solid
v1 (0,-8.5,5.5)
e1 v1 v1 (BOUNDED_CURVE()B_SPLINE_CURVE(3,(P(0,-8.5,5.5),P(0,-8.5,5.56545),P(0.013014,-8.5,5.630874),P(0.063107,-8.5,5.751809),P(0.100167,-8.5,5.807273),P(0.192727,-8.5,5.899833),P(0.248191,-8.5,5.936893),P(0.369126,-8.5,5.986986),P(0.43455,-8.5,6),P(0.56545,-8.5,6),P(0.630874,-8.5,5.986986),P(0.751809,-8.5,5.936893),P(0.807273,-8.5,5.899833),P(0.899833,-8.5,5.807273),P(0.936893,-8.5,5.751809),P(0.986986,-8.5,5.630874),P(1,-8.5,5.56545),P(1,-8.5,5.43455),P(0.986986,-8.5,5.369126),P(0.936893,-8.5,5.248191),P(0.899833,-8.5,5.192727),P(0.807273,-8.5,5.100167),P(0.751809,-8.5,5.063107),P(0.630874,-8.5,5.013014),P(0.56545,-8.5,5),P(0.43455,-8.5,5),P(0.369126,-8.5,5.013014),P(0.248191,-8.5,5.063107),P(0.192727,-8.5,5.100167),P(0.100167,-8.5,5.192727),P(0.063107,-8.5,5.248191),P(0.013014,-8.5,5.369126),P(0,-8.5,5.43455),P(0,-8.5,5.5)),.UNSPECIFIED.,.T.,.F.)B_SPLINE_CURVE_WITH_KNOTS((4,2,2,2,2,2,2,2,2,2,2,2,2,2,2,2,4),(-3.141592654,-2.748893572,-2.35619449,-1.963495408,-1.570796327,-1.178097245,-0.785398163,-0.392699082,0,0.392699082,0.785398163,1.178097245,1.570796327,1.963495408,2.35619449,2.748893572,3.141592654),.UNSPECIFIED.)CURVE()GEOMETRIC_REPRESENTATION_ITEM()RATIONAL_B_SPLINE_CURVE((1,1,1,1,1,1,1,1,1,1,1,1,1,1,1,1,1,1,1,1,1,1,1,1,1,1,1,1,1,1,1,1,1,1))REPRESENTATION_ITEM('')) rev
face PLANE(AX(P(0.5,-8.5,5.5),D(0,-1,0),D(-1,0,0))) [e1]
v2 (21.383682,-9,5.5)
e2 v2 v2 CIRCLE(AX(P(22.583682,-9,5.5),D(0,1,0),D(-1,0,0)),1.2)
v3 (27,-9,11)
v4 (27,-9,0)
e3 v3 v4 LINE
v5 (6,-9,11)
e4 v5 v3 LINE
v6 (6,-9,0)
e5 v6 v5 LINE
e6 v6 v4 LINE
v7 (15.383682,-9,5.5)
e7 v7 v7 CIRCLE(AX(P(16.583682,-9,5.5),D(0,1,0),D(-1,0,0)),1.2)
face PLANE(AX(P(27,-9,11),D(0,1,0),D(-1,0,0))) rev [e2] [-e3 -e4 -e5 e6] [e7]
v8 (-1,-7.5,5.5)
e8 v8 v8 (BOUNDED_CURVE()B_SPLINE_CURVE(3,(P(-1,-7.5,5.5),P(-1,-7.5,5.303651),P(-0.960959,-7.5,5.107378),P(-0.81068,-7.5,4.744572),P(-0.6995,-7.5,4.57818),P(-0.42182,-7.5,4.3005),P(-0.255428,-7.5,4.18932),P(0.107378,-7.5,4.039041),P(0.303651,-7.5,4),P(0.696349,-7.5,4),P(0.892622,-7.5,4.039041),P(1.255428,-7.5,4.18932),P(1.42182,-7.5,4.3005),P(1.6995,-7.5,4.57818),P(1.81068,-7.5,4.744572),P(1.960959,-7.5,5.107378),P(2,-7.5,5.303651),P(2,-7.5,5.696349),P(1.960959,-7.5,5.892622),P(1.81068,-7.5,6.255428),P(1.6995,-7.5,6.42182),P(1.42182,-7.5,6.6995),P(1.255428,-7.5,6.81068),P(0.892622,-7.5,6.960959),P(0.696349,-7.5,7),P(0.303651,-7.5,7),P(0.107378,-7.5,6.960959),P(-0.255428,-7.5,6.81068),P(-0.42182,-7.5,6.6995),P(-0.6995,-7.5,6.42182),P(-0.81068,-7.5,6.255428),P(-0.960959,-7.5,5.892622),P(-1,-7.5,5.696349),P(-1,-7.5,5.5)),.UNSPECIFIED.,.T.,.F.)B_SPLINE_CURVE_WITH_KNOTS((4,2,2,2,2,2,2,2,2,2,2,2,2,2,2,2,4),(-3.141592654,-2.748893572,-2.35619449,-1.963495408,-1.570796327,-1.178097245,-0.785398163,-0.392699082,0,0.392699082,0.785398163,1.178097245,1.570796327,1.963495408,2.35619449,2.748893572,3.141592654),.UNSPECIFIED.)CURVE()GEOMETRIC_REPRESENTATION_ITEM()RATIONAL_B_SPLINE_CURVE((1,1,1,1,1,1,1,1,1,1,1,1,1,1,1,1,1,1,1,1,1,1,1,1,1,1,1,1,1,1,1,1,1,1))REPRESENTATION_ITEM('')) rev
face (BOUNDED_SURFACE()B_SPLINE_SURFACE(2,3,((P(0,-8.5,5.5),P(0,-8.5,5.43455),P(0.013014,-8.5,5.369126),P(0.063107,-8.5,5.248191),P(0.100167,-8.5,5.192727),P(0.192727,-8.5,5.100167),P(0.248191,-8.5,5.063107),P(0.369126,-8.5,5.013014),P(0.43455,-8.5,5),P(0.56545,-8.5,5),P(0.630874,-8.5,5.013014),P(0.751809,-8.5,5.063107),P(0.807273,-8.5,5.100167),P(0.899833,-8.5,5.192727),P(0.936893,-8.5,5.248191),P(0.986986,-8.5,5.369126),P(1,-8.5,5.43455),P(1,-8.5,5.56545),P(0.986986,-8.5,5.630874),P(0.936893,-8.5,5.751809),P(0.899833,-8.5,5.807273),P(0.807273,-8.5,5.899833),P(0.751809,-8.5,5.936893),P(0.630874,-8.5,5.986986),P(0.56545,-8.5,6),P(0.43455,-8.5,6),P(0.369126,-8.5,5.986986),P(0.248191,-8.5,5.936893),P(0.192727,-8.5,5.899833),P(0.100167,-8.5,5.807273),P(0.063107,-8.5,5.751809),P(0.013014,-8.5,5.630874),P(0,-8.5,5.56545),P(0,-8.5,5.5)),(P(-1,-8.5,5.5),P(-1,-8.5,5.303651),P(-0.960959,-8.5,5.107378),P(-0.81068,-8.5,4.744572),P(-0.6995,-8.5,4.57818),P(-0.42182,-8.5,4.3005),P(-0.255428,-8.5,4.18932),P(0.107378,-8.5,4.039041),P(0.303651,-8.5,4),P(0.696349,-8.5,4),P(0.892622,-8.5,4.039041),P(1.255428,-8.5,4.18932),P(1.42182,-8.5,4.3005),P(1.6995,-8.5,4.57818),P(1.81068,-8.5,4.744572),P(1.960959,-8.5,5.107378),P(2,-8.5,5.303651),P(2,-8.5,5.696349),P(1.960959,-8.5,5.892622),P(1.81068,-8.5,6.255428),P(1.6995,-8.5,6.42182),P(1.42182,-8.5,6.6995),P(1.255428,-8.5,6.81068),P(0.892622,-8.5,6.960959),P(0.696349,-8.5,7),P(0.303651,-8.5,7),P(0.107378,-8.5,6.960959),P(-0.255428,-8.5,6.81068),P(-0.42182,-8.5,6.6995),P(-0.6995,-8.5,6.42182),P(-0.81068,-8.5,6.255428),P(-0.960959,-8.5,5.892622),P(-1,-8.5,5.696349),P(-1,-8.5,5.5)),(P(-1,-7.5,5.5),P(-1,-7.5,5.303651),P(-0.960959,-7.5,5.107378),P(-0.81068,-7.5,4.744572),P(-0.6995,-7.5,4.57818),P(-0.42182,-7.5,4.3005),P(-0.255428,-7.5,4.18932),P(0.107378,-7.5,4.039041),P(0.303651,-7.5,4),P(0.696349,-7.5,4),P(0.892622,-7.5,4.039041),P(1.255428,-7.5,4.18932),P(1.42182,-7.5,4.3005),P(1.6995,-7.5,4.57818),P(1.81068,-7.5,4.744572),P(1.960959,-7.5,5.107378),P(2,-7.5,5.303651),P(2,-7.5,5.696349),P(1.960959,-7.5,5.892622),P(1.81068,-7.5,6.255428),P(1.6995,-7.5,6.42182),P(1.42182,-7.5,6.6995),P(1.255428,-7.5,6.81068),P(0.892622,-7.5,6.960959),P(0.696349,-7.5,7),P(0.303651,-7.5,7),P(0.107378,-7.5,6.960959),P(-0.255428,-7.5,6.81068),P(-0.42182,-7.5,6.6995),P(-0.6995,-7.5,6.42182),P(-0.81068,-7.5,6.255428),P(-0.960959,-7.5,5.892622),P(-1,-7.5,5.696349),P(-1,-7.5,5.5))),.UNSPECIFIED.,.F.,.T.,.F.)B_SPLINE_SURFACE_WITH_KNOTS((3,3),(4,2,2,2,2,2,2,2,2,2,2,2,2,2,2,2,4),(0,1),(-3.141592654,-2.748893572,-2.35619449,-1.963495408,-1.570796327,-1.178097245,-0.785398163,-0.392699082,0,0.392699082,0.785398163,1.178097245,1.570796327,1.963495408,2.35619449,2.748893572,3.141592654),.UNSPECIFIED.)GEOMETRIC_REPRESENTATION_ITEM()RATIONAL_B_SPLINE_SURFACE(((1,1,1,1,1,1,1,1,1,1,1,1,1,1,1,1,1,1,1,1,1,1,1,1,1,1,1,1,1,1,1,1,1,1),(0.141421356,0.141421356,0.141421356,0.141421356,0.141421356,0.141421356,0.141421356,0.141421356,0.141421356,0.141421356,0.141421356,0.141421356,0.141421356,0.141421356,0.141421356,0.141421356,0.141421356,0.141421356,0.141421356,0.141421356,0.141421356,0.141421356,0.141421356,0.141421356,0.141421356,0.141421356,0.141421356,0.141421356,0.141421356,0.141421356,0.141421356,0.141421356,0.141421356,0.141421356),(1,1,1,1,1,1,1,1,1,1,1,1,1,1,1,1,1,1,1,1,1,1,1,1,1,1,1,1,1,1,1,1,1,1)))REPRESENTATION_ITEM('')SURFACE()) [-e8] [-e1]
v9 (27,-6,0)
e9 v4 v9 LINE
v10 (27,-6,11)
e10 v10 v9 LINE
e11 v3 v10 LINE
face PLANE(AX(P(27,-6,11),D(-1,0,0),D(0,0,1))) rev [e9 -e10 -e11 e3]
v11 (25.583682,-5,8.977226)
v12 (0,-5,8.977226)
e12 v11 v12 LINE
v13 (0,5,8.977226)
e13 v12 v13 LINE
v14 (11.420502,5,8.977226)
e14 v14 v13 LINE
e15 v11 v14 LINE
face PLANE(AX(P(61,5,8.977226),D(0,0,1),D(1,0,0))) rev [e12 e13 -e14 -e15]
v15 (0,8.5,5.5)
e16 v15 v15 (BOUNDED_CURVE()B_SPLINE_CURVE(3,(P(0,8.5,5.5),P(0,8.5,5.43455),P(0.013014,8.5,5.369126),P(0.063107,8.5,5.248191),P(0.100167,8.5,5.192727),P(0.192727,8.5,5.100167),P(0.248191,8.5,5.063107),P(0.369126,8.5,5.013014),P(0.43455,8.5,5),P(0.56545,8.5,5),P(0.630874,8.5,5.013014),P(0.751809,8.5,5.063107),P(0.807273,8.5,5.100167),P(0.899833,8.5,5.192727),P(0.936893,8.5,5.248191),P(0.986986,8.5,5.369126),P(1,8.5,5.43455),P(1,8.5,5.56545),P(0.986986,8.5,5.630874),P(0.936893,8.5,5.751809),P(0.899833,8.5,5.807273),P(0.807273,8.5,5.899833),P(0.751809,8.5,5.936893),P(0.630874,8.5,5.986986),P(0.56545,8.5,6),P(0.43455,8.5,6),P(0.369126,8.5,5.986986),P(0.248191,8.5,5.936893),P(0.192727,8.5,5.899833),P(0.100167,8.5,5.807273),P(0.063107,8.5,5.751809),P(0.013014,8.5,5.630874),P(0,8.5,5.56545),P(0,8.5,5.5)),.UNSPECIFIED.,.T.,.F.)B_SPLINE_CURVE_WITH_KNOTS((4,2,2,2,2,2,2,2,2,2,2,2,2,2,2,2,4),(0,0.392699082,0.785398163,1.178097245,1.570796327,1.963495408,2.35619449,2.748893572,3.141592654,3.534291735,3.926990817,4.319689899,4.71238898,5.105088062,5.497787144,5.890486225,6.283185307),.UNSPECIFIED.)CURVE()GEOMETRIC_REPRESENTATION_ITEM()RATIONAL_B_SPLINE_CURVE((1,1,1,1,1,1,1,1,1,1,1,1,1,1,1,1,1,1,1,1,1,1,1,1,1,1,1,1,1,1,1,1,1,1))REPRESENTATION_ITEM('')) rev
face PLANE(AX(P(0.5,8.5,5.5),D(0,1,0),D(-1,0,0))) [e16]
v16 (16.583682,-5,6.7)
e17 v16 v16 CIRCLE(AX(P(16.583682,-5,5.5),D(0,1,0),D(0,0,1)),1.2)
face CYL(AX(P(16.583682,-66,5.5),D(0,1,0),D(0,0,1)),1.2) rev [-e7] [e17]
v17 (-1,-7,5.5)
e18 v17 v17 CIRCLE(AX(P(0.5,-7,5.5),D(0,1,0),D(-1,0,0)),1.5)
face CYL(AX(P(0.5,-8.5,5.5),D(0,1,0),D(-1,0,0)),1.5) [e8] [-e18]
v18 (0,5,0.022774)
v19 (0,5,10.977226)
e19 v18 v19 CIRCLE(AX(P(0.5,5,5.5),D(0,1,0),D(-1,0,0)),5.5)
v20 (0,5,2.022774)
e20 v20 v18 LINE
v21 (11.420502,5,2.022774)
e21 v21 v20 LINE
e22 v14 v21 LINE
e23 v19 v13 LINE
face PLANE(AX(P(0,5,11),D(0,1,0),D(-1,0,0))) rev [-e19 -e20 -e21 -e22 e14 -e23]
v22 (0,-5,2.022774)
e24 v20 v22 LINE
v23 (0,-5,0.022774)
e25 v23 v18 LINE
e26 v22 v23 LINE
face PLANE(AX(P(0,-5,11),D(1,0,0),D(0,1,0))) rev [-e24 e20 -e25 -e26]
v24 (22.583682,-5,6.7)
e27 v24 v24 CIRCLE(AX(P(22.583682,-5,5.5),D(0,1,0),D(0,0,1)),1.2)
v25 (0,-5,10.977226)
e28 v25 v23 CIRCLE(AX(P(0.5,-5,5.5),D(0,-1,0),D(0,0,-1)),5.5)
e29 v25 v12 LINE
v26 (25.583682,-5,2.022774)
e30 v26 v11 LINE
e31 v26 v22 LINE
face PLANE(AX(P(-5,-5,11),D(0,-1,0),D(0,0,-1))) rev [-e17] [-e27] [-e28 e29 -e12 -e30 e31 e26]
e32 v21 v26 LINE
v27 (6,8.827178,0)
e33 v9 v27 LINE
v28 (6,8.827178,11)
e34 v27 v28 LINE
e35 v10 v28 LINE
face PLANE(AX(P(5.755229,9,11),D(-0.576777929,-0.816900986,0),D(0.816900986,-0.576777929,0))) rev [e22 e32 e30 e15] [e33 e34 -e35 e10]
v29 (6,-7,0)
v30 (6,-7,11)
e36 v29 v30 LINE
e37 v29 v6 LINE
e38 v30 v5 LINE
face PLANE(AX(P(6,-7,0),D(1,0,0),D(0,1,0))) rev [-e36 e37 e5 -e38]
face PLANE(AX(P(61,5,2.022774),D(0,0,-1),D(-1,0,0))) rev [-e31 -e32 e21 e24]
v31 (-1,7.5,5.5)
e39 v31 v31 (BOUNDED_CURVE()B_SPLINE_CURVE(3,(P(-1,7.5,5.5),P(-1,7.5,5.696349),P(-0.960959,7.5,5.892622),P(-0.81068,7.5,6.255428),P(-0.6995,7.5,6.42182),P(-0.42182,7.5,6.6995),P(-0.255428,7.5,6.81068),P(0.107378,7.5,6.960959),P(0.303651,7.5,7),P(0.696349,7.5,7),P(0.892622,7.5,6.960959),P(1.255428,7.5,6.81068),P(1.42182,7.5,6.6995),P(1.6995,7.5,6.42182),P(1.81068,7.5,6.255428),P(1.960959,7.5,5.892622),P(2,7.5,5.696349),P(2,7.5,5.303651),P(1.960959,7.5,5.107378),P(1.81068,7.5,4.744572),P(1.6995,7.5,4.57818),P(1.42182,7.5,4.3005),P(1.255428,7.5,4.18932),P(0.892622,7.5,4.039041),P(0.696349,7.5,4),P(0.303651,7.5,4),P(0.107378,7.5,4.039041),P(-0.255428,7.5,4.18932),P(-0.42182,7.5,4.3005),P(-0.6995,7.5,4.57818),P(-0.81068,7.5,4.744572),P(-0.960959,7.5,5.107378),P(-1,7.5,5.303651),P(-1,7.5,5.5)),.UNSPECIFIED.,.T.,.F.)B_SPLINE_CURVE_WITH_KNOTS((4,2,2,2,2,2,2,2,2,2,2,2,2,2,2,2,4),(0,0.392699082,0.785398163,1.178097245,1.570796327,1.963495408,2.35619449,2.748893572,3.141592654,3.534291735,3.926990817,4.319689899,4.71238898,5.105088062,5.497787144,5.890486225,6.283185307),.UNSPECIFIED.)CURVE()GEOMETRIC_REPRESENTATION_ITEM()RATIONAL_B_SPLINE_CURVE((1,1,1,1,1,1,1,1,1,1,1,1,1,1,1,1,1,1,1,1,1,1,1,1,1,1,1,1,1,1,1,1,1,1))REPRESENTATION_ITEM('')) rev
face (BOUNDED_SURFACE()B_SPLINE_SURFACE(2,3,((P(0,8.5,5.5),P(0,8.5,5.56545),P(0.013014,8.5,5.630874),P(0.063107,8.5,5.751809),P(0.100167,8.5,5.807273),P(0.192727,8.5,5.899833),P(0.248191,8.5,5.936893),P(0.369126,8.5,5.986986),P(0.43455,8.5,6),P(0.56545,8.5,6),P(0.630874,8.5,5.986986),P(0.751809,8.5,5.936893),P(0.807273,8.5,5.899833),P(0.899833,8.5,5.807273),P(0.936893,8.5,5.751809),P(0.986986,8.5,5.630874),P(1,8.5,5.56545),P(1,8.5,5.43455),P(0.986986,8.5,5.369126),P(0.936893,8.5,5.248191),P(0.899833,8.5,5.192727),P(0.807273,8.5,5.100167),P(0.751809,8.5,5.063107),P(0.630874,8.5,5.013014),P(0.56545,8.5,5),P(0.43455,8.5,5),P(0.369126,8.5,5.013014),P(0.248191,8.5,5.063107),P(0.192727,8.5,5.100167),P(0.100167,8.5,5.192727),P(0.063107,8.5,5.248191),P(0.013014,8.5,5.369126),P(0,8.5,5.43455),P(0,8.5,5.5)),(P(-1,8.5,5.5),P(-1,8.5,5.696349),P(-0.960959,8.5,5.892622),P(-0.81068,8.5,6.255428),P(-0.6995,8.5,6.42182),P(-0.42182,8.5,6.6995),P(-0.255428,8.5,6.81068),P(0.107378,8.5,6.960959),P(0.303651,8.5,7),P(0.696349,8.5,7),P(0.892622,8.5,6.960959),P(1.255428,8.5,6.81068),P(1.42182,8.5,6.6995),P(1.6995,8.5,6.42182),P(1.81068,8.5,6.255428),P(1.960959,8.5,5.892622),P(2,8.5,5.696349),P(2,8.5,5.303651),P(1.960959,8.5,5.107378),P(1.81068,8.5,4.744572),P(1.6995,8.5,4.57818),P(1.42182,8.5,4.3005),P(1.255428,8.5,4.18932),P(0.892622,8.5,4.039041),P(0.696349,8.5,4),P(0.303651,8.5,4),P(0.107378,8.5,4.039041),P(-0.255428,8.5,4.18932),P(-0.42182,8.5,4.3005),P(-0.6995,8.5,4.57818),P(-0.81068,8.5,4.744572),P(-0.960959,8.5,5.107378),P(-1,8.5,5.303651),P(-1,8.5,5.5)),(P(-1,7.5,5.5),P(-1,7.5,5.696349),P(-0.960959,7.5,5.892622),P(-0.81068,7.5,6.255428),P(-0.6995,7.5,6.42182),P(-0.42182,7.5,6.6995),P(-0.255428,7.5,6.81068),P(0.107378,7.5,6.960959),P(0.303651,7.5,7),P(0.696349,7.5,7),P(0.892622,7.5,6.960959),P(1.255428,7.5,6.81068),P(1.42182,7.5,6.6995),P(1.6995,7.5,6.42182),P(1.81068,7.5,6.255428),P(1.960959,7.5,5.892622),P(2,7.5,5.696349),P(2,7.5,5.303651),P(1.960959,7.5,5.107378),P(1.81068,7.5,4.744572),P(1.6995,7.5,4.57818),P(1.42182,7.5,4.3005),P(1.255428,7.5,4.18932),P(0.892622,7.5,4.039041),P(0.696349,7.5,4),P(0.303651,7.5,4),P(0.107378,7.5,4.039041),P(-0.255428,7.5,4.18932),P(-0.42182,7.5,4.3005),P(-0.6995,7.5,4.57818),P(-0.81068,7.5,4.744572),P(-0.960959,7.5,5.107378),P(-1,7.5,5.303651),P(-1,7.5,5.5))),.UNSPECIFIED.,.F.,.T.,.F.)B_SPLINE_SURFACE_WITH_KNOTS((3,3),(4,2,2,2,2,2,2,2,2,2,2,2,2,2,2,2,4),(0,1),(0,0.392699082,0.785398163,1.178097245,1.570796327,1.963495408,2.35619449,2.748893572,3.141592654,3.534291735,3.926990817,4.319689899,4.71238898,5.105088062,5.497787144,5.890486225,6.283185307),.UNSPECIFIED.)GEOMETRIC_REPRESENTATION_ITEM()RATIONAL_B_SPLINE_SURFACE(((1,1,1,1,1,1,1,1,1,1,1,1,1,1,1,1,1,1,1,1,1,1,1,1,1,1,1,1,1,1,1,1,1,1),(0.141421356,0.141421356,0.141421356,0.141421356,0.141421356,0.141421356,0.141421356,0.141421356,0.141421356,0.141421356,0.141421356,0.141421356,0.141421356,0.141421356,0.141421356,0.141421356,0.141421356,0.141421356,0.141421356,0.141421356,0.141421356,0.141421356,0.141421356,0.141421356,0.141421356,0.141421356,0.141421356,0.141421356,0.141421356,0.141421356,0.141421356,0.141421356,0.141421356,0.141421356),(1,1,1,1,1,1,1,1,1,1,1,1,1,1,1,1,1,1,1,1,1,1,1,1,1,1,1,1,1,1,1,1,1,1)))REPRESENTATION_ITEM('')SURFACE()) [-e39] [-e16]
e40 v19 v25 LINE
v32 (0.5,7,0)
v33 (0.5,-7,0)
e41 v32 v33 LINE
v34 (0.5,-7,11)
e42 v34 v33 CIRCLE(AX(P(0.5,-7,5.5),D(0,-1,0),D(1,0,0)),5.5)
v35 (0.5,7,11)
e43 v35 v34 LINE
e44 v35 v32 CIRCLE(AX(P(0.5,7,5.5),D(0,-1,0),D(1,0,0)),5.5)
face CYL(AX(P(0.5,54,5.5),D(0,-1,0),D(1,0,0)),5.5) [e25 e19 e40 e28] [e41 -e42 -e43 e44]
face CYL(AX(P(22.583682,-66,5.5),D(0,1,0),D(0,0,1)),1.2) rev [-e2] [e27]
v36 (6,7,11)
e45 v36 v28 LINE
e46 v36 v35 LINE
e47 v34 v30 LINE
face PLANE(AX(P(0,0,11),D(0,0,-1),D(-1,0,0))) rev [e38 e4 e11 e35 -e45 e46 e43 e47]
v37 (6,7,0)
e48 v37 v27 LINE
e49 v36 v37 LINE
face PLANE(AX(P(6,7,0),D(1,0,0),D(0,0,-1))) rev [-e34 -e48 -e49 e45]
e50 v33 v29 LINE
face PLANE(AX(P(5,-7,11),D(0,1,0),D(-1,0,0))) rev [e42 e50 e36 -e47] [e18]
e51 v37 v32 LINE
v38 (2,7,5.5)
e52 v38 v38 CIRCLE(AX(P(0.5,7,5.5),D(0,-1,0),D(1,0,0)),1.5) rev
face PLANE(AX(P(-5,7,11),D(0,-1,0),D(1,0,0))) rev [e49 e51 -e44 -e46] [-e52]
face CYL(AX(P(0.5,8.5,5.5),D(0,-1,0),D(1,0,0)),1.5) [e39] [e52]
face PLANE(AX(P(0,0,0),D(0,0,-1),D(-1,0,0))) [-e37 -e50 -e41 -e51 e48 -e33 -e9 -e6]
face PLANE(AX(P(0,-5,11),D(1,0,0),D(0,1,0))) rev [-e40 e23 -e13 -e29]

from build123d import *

# Parameters (mm, degrees)
SALIENTE_EXTRUIR1_DEPTH = 11
CORTAR_EXTRUIR1_DEPTH   = 61
CROQUIS3_W              = 6.95445115
CROQUIS3_H              = 10
CORTAR_EXTRUIR2_DEPTH   = 61
CROQUIS4_R              = 1.2
CORTAR_EXTRUIR3_DEPTH   = 61
CROQUIS5_R              = 1.5
SALIENTE_EXTRUIR2_DEPTH = 1.5
REDONDEO2_SIZE          = 1
REDONDEO6_SIZE          = 1
CROQUIS6_W              = 1
CROQUIS6_H              = 11
CORTAR_EXTRUIR4_DEPTH   = 2
CROQUIS7_W              = 1
CROQUIS7_H              = 11
CORTAR_EXTRUIR5_DEPTH   = 2


with BuildPart() as part:
    # Croquis1 → Saliente-Extruir1 (new body)
    with BuildSketch(Plane.XY):
        Polygon((-5, 7), (5, 7), (5, 9), (5.755229402, 9), (27, -6), (27, -9), (5, -9), (5, -7), (-5, -7), (-5, -5), (0, -5), (0, 5), (-5, 5), align=None)
    extrude(amount=SALIENTE_EXTRUIR1_DEPTH)

    # Croquis2 → Cortar-Extruir1 (cut)
    with BuildSketch(Plane.XZ.offset(7)):
        with BuildLine():
            ThreePointArc((-5, 5.5), (-3.389087297, 9.389087297), (0.5, 11))
            Line((0.5, 11), (-5, 11))
            Line((-5, 11), (-5, 5.5))
        make_face()
        with BuildLine():
            ThreePointArc((0.5, 0), (-3.389087297, 1.610912703), (-5, 5.5))
            Line((-5, 5.5), (-5, 0))
            Line((-5, 0), (0.5, 0))
        make_face()
    extrude(amount=-CORTAR_EXTRUIR1_DEPTH, mode=Mode.SUBTRACT)

    # Croquis3 → Cortar-Extruir2 (cut)
    with BuildSketch(Plane.ZY):
        with Locations((5.5, 0)):
            Rectangle(CROQUIS3_W, CROQUIS3_H)
    extrude(amount=-CORTAR_EXTRUIR2_DEPTH, mode=Mode.SUBTRACT)

    # Croquis4 → Cortar-Extruir3 (cut)
    with BuildSketch(Plane(origin=(0, -5, 0), x_dir=(1, 0, 0), z_dir=(0, 1, 0))):
        with Locations(Location((22.58368196, -5.5, 0), (0, 0, 270))):
            Circle(CROQUIS4_R)
        with Locations(Location((16.58368196, -5.5, 0), (0, 0, 270))):
            Circle(CROQUIS4_R)
    extrude(amount=-CORTAR_EXTRUIR3_DEPTH, mode=Mode.SUBTRACT)

    # Croquis5 → Saliente-Extruir2 (add)
    with BuildSketch(Plane(origin=(0, 7, 0), x_dir=(1, 0, 0), z_dir=(0, 1, 0))):
        with Locations((0.5, -5.5)):
            Circle(CROQUIS5_R)
    saliente_extruir2 = extrude(amount=SALIENTE_EXTRUIR2_DEPTH)

    # Simetría4: Saliente-Extruir2 across plane
    add(saliente_extruir2.mirror(Plane.ZX))

    # Redondeo2
    # a fillet whose section is not a circle: 1 mm, written as the material it takes off along each edge
    with BuildSketch(Plane(origin=(0.5, 8.5, 5.5), x_dir=(1, 0, 0), z_dir=(0, 0, 1))) as redondeo2_piece_1:
        with BuildLine():
            Bezier((1.5, -REDONDEO2_SIZE), (1.5, 0), (1.5 - REDONDEO2_SIZE, 0), weights=[1, 0.141421356, 1])
            Line((1.5 - REDONDEO2_SIZE, 0), (1.5, 0))
            Line((1.5, 0), (1.5, -REDONDEO2_SIZE))
        make_face()
    revolve(axis=Axis((0.5, 8.5, 5.5), (0, 1, 0)), mode=Mode.SUBTRACT)

    # Redondeo6
    # a fillet whose section is not a circle: 1 mm, written as the material it takes off along each edge
    with BuildSketch(Plane(origin=(0.5, -8.5, 5.5), x_dir=(1, 0, 0), z_dir=(0, 0, 1))) as redondeo6_piece_1:
        with BuildLine():
            Bezier((1.5, REDONDEO6_SIZE), (1.5, 0), (1.5 - REDONDEO6_SIZE, 0), weights=[1, 0.141421356, 1])
            Line((1.5 - REDONDEO6_SIZE, 0), (1.5, 0))
            Line((1.5, 0), (1.5, REDONDEO6_SIZE))
        make_face()
    revolve(axis=Axis((0.5, -8.5, 5.5), (0, 1, 0)), mode=Mode.SUBTRACT)

    # Croquis6 → Cortar-Extruir4 (cut)
    with BuildSketch(Plane(origin=(0, 9, 0), x_dir=(1, 0, 0), z_dir=(0, 1, 0))):
        with Locations((5.5, -5.5)):
            Rectangle(CROQUIS6_W, CROQUIS6_H)
    extrude(amount=-CORTAR_EXTRUIR4_DEPTH, mode=Mode.SUBTRACT)

    # Croquis7 → Cortar-Extruir5 (cut)
    with BuildSketch(Plane.XZ.offset(9)):
        with Locations((5.5, 5.5)):
            Rectangle(CROQUIS7_W, CROQUIS7_H)
    extrude(amount=-CORTAR_EXTRUIR5_DEPTH, mode=Mode.SUBTRACT)


solid = part.part
